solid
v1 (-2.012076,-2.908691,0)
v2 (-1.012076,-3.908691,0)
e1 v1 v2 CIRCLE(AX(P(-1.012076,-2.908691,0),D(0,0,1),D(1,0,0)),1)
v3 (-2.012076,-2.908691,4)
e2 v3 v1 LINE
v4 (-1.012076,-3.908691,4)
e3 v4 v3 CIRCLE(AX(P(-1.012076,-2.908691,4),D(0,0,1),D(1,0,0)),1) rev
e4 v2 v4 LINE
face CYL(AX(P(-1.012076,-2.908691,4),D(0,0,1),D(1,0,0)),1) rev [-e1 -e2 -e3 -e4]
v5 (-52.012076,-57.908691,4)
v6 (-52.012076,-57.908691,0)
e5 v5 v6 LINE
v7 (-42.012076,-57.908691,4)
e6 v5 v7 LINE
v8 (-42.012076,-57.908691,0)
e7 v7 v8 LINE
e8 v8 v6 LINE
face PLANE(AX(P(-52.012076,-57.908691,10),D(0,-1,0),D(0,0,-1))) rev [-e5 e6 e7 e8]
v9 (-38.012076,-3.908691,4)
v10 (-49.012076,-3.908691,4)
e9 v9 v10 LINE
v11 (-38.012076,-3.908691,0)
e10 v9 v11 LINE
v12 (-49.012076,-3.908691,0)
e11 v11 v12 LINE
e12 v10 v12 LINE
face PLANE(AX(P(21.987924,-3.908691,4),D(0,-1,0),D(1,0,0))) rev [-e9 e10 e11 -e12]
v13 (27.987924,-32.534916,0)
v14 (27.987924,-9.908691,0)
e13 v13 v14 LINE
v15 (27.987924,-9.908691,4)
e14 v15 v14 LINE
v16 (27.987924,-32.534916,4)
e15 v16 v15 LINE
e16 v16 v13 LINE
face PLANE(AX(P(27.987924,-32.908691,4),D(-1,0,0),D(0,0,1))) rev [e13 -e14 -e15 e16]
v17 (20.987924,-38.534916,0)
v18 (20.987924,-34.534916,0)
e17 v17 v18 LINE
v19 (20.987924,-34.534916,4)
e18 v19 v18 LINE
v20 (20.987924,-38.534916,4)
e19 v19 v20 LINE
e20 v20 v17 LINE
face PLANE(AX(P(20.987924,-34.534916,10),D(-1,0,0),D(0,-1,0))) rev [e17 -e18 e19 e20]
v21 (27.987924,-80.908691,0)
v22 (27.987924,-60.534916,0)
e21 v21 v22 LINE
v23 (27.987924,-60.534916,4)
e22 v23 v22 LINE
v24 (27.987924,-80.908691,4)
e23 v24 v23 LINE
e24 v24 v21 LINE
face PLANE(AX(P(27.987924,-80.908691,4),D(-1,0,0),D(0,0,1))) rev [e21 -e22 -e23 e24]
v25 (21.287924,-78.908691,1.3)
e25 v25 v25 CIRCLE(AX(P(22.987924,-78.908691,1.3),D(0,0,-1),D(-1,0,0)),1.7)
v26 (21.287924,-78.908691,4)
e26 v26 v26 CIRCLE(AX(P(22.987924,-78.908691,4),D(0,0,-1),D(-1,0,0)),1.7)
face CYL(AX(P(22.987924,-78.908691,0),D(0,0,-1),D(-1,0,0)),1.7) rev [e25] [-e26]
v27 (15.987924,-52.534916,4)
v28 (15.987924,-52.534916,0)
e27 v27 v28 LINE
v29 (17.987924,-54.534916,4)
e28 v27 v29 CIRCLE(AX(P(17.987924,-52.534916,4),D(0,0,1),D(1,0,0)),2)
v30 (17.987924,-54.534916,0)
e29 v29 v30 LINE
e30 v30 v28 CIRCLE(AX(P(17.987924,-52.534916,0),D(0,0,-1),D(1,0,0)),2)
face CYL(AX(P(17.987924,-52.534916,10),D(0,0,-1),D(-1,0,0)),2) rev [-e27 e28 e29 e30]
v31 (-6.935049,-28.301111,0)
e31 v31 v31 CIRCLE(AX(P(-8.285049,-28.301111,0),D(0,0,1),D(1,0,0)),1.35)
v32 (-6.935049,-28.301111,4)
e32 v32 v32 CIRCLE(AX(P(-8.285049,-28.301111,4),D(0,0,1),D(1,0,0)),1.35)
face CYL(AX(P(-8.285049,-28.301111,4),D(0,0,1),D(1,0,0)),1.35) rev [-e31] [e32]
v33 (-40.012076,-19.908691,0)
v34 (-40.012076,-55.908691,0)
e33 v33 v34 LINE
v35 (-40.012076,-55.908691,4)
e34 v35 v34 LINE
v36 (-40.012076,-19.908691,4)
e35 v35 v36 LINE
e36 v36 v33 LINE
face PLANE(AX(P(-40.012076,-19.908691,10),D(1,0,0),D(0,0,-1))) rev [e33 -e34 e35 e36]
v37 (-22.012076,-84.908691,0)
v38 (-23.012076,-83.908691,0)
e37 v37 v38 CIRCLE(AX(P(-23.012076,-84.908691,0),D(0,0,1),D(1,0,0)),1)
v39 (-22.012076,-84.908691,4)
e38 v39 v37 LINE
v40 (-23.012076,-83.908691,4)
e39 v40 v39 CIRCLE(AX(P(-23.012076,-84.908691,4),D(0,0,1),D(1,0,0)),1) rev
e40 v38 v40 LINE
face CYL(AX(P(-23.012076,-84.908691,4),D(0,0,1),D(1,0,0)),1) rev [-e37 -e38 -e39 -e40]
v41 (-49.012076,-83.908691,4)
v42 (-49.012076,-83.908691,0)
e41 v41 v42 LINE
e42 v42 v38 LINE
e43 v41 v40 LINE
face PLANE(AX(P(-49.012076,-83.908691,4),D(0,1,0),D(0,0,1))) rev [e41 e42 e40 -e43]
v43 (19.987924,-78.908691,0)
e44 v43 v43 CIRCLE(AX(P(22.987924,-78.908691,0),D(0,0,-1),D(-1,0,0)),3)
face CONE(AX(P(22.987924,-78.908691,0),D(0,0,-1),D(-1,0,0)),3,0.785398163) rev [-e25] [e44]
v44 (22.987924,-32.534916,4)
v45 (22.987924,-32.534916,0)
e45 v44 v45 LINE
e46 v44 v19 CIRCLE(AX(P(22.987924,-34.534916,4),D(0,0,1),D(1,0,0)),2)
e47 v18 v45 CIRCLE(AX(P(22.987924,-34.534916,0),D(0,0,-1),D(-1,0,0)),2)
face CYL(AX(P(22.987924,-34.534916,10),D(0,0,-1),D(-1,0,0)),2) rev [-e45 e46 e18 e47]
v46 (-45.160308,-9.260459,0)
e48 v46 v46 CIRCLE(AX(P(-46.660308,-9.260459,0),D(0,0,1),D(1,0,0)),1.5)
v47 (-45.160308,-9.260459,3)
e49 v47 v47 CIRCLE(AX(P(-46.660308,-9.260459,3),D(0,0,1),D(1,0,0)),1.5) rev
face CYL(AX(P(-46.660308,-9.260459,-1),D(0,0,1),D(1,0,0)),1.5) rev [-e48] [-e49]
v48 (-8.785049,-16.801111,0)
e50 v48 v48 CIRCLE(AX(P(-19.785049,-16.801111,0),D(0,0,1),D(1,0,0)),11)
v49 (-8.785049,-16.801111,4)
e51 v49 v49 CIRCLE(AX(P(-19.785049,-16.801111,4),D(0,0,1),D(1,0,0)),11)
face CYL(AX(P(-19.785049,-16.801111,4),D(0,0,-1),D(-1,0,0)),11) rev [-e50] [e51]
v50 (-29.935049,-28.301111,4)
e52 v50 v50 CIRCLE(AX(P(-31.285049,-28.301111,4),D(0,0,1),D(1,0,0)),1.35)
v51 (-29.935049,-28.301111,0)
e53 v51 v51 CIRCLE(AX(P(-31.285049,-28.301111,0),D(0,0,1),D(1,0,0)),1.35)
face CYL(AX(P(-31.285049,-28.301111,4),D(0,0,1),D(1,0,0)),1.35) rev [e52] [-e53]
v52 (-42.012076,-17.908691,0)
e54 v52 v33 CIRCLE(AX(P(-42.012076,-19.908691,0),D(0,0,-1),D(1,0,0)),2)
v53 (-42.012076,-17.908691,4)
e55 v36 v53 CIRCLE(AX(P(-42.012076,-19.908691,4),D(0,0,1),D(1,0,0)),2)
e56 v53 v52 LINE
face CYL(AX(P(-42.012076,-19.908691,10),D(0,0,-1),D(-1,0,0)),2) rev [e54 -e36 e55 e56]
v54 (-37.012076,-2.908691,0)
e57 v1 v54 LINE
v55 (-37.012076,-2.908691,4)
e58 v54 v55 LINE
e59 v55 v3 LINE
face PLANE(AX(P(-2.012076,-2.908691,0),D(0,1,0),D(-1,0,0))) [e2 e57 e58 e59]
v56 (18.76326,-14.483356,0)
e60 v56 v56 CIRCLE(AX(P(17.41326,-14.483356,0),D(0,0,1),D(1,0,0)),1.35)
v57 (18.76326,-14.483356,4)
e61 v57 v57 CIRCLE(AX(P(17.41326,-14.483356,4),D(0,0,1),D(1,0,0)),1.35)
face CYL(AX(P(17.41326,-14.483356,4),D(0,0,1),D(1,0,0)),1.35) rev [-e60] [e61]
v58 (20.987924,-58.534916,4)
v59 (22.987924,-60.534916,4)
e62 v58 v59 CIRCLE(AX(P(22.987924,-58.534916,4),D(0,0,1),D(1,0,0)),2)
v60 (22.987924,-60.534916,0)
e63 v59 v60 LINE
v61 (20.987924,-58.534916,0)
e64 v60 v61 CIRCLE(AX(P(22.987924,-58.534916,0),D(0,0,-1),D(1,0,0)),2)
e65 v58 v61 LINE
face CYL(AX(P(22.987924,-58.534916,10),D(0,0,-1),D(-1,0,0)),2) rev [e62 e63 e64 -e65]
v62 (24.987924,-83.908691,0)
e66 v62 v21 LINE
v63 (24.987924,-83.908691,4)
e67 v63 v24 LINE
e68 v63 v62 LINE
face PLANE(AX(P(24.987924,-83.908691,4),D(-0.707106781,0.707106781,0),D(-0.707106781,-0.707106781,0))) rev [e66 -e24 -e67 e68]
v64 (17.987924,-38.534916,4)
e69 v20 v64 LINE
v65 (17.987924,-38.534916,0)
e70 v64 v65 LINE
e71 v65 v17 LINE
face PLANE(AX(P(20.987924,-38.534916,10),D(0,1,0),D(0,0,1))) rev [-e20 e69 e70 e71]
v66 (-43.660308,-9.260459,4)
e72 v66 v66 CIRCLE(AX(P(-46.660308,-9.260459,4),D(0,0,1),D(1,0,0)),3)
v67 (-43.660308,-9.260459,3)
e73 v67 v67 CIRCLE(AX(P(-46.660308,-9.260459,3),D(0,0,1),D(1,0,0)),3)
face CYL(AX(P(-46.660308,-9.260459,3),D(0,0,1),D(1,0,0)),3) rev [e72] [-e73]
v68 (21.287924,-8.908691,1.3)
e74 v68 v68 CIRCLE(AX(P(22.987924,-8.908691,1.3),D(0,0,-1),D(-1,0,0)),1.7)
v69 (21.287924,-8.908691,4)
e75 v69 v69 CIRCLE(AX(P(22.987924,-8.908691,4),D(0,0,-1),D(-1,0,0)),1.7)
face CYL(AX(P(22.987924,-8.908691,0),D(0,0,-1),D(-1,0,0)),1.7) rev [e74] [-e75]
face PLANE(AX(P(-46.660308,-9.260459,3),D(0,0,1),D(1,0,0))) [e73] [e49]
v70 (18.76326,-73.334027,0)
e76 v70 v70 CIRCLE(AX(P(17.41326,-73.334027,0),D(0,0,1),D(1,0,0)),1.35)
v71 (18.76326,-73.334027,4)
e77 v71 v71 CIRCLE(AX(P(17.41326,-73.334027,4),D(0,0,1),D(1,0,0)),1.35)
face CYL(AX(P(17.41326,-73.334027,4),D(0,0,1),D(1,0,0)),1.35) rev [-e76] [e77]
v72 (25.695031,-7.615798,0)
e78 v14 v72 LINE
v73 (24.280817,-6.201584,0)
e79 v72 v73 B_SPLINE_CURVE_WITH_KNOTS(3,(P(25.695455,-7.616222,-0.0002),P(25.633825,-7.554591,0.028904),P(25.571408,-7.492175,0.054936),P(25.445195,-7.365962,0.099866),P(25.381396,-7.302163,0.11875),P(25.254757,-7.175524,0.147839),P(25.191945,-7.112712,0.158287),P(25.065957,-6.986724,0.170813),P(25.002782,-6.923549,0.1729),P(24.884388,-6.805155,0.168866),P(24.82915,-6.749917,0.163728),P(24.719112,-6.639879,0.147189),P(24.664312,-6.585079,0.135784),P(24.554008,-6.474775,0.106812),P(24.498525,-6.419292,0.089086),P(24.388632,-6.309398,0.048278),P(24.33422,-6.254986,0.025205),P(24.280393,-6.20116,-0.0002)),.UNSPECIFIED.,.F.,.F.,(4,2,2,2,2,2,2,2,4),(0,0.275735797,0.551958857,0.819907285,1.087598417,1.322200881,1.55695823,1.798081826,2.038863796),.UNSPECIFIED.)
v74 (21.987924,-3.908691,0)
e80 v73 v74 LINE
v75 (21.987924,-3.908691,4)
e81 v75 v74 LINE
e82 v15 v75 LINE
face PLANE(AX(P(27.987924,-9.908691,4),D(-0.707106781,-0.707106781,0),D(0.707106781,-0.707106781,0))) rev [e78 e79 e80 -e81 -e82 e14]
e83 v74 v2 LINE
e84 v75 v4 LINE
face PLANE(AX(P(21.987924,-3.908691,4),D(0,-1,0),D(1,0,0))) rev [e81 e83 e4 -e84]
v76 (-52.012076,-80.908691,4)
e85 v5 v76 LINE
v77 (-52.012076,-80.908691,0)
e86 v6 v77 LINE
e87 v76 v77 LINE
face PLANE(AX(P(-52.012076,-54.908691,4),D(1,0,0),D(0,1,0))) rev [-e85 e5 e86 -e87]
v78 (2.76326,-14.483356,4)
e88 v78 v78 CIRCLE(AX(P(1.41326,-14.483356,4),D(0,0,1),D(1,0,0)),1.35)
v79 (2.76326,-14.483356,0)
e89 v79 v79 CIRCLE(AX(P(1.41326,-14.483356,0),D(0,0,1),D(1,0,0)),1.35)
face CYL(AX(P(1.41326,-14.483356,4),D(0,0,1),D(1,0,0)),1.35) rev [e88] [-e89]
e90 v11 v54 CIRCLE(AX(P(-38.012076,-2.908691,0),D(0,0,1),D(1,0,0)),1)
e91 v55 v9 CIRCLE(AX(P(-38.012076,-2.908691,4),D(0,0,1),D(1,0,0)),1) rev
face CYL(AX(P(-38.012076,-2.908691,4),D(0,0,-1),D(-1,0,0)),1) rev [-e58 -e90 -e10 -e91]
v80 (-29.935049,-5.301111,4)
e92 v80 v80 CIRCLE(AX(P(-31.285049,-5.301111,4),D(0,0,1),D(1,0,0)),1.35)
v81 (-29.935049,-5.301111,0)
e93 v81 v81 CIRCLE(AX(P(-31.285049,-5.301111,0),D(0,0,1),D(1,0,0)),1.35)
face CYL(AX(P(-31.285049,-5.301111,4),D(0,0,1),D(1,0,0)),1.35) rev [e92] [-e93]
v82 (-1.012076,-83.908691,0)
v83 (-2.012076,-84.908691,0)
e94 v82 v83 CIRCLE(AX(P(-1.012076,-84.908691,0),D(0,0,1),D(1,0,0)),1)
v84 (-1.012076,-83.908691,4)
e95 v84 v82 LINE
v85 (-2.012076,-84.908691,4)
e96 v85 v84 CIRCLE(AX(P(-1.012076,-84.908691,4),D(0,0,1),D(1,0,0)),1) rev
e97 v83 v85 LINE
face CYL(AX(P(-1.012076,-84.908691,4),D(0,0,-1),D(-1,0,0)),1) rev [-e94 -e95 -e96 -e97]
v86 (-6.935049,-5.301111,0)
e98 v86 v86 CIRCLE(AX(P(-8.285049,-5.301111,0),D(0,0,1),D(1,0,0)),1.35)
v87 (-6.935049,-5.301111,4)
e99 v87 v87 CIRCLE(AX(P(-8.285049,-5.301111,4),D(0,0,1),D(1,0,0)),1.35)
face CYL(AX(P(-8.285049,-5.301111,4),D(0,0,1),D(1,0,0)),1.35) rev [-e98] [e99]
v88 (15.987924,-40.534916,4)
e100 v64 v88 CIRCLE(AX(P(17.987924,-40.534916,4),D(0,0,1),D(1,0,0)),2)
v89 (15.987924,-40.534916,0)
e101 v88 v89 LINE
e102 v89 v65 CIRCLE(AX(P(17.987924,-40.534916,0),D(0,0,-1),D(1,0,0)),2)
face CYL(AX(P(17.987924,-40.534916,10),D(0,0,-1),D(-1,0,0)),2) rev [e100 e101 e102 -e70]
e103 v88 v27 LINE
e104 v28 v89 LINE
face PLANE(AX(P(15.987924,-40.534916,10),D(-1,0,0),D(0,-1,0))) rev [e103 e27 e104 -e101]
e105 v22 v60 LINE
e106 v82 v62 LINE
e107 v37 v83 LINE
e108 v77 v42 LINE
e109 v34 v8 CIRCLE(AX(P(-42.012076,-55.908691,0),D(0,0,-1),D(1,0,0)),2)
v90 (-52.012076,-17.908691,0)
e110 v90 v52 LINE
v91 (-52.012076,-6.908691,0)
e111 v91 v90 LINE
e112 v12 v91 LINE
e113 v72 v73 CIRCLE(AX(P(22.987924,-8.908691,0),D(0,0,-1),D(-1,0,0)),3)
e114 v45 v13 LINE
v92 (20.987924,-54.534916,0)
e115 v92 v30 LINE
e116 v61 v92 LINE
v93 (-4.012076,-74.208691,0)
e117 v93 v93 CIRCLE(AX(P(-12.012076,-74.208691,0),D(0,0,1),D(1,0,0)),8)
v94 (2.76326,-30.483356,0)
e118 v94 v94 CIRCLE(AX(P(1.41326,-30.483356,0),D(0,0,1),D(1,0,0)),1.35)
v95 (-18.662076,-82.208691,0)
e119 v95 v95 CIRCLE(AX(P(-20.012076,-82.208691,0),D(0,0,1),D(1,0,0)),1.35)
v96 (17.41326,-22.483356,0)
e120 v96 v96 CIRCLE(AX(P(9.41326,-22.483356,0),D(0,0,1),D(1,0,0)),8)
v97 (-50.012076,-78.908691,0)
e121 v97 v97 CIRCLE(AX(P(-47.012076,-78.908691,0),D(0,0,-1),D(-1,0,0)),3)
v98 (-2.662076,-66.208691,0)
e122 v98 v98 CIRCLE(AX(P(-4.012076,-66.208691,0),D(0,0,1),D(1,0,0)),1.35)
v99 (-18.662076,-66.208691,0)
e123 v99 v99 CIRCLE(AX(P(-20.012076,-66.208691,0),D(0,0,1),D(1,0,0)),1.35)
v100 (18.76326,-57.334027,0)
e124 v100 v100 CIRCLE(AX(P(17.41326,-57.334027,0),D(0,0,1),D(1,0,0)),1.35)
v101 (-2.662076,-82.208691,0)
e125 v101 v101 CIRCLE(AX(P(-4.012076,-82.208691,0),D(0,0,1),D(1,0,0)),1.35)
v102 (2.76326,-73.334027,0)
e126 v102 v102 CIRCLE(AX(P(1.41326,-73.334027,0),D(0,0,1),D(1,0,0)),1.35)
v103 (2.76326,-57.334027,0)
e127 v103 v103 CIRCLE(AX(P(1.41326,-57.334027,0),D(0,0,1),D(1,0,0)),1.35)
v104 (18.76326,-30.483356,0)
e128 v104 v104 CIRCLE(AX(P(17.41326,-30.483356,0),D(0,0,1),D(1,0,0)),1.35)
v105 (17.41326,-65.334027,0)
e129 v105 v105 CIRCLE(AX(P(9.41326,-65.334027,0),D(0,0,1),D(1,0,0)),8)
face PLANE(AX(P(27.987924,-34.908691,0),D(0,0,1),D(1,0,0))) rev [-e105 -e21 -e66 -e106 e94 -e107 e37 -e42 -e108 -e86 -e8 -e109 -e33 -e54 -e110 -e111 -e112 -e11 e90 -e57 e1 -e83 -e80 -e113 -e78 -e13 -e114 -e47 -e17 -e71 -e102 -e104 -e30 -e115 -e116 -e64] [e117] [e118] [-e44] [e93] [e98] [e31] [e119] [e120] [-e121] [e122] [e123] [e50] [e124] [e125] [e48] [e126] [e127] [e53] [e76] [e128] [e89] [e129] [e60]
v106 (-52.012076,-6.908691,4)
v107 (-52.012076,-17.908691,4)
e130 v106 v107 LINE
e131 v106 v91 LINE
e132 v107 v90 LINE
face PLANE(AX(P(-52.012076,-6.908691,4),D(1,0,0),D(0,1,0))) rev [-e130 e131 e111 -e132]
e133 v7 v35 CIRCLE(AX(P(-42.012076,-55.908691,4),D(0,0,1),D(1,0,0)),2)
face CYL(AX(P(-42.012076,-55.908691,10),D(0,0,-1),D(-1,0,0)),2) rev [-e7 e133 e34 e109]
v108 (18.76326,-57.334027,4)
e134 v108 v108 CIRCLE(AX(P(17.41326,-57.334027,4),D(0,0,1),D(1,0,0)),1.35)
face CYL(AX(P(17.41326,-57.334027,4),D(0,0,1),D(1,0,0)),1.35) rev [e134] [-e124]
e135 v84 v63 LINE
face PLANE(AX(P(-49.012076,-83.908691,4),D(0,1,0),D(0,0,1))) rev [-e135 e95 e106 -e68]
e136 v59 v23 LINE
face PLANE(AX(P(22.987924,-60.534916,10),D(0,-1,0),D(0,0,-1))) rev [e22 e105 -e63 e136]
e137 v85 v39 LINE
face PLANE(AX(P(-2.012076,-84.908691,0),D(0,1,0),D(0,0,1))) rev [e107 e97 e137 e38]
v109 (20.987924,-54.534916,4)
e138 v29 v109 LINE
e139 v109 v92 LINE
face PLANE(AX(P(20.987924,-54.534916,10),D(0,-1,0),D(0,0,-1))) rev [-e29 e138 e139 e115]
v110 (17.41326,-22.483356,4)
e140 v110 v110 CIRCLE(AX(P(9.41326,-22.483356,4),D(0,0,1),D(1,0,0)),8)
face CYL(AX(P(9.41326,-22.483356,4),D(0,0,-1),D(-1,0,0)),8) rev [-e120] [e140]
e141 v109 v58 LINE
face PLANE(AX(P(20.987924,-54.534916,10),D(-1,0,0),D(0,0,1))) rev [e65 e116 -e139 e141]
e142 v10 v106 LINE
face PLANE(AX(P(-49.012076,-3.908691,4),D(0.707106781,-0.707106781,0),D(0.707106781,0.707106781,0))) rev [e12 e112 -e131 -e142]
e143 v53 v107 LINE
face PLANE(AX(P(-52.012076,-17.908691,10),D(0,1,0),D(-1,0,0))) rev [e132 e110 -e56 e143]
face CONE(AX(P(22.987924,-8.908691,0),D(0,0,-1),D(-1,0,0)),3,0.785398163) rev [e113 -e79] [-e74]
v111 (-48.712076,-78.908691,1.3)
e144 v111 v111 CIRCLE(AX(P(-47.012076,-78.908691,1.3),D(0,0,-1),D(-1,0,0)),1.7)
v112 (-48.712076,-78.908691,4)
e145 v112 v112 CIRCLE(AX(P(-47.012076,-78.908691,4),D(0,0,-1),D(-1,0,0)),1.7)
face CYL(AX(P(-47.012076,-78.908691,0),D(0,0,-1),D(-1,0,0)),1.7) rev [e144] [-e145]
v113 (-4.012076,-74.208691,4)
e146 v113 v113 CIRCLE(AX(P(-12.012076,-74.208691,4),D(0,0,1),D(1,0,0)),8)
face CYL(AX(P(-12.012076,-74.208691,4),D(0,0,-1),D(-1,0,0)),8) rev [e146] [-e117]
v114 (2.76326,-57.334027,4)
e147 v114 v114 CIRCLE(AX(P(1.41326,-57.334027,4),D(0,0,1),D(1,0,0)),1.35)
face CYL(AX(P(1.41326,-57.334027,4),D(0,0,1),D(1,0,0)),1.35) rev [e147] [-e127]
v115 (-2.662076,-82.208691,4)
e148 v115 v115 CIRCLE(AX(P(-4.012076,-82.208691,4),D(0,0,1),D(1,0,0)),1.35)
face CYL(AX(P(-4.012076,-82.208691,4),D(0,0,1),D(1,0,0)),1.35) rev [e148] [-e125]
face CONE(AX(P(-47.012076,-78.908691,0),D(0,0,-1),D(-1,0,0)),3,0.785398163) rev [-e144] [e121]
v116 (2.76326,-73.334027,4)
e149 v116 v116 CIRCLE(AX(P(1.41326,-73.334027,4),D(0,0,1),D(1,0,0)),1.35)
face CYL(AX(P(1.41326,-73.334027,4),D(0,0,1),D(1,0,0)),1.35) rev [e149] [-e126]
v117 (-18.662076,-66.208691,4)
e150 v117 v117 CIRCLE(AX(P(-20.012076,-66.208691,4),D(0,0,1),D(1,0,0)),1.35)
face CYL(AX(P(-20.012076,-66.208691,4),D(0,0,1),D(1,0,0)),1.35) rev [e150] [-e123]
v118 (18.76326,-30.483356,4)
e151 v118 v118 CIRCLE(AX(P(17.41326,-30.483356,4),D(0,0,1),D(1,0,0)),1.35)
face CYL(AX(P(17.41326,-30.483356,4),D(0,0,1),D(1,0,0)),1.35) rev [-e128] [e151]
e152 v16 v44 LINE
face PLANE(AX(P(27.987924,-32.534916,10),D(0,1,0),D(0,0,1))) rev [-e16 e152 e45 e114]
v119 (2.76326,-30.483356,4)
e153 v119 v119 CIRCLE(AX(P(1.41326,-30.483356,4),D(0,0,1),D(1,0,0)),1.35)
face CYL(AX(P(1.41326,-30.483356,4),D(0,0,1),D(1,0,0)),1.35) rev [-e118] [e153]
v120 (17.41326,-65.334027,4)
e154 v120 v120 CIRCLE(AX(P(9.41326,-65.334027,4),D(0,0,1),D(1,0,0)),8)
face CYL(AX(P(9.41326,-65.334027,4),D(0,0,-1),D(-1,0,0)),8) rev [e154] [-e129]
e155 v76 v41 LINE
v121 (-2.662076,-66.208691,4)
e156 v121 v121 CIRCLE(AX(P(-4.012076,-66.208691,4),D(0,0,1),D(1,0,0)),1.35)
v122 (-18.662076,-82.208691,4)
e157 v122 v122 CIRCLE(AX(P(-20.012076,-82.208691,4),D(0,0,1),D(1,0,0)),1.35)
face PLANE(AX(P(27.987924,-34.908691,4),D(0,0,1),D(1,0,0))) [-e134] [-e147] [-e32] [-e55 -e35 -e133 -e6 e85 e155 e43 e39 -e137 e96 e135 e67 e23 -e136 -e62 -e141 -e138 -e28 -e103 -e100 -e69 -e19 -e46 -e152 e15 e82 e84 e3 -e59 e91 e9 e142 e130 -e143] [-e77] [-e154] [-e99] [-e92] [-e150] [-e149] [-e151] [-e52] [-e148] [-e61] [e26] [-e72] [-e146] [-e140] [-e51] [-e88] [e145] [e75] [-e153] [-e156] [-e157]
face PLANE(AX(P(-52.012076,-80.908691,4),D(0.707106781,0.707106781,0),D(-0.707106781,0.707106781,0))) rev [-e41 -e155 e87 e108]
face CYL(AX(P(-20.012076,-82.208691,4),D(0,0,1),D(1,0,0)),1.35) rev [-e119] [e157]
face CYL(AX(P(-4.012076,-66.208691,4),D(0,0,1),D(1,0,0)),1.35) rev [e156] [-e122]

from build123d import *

# Parameters (mm, degrees)
SKETCH_1_R                  = 11
SKETCH_1_R_2                = 8
EXTRUDE_1_DEPTH             = 4
SKETCH_2_R                  = 1.5
CUT_EXTRUDE_1_DEPTH         = 5
HOLE_WIZARD_2_7_2_7_1_D     = 2.7
HOLE_WIZARD_2_7_2_7_1_DEPTH = 8
HOLE_WIZARD_2_7_2_7_1_TIP   = 0.779422863
SKETCH_5_W                  = 35
SKETCH_5_H                  = 4
EXTRUDE_2_DEPTH             = 1
FILLET_1_R                  = 1
SKETCH_6_W                  = 20
SKETCH_6_H                  = 4
EXTRUDE_3_DEPTH             = 1
FILLET_2_R                  = 1
CUT_EXTRUDE_4_DEPTH         = 10
SKETCH_8_R                  = 3
CUT_EXTRUDE_5_DEPTH         = 1
HOLE_WIZARD_M31_D           = 3.4
HOLE_WIZARD_M31_CSINK_D     = 6
HOLE_WIZARD_M31_CSINK_ANGLE = 90


with BuildPart() as part:
    # Эскиз1 → Вытянуть1 (new body)
    with BuildSketch(Plane.XY):
        with BuildLine():
            Line((27.987924211, -32.908691095), (27.987924211, -9.908691095))
            Line((27.987924211, -9.908691095), (21.987924211, -3.908691095))
            Line((21.987924211, -3.908691095), (-49.012075789, -3.908691095))
            Line((-49.012075789, -3.908691095), (-52.012075789, -6.908691095))
            Line((-52.012075789, -6.908691095), (-52.012075789, -32.908691095))
            ThreePointArc((-52.012075789, -32.908691095), (-50.597862227, -33.494477533), (-50.012075789, -34.908691095))
            Line((-50.012075789, -34.908691095), (-50.012075789, -52.908691095))
            ThreePointArc((-50.012075789, -52.908691095), (-50.597862227, -54.322904658), (-52.012075789, -54.908691095))
            Line((-52.012075789, -54.908691095), (-52.012075789, -80.908691095))
            Line((-52.012075789, -80.908691095), (-49.012075789, -83.908691095))
            Line((-49.012075789, -83.908691095), (24.987924211, -83.908691095))
            Line((24.987924211, -83.908691095), (27.987924211, -80.908691095))
            Line((27.987924211, -80.908691095), (27.987924211, -54.908691095))
            ThreePointArc((27.987924211, -54.908691095), (26.573710649, -54.322904658), (25.987924211, -52.908691095))
            Line((25.987924211, -52.908691095), (25.987924211, -34.908691095))
            ThreePointArc((25.987924211, -34.908691095), (26.573710649, -33.494477533), (27.987924211, -32.908691095))
        make_face()
        with Locations((-19.785049223, -16.80111127)):
            Circle(SKETCH_1_R, mode=Mode.SUBTRACT)
        with Locations((9.413259681, -22.483355625)):
            Circle(SKETCH_1_R_2, mode=Mode.SUBTRACT)
        with Locations((-12.012075789, -74.208691095)):
            Circle(SKETCH_1_R_2, mode=Mode.SUBTRACT)
        with Locations((9.413259681, -65.334026565)):
            Circle(SKETCH_1_R_2, mode=Mode.SUBTRACT)
    extrude(amount=EXTRUDE_1_DEPTH)

    # Эскиз2 → Вырез-Вытянуть1 (cut)
    with BuildSketch(Plane.XY.offset(4)):
        with Locations((-46.660308067, -9.260458817)):
            Circle(SKETCH_2_R)
    extrude(amount=-CUT_EXTRUDE_1_DEPTH, mode=Mode.SUBTRACT)

    # Диаметр отверстия Ø2.7 (2.7)1
    with Locations(Plane(origin=(-8.285049223, -5.30111127, 4), x_dir=(1, 0, 0), z_dir=(0, 0, 1))):
        with Locations((0, 0), (0, -23), (-23, -23), (-23, 0), (25.698308904, -9.182244355), (25.698308904, -25.182244355), (9.698308904, -25.182244355), (9.698308904, -9.182244355), (25.698308904, -52.032915295), (25.698308904, -68.032915295), (9.698308904, -68.032915295), (9.698308904, -52.032915295), (4.272973434, -60.907579825), (4.272973434, -76.907579825), (-11.727026566, -60.907579825), (-11.727026566, -76.907579825)):
            Hole(HOLE_WIZARD_2_7_2_7_1_D / 2, depth=HOLE_WIZARD_2_7_2_7_1_DEPTH)
            with Locations((0, 0, -(HOLE_WIZARD_2_7_2_7_1_DEPTH + HOLE_WIZARD_2_7_2_7_1_TIP / 2))):  # 120° drill point
                Cone(0, HOLE_WIZARD_2_7_2_7_1_D / 2, HOLE_WIZARD_2_7_2_7_1_TIP, mode=Mode.SUBTRACT)

    # Эскиз5 → Вытянуть2 (add)
    with BuildSketch(Plane(origin=(0, -3.908691095, 0), x_dir=(1, 0, 0), z_dir=(0, 1, 0))):
        with Locations((-19.512075789, -2)):
            Rectangle(SKETCH_5_W, SKETCH_5_H)
    extrude(amount=EXTRUDE_2_DEPTH)

    # Скругление1
    fillet_1_edges = [part.edges().sort_by_distance(p)[0] for p in [
        (-2.012075789, -3.908691095, 2),
        (-37.012075789, -3.908691095, 2),
    ]]
    fillet(fillet_1_edges, radius=FILLET_1_R - 0.0001)  # a hair under: the kernel refuses the full size

    # Эскиз6 → Вытянуть3 (add)
    with BuildSketch(Plane.XZ.offset(83.908691095)):
        with Locations((-12.012075789, 2)):
            Rectangle(SKETCH_6_W, SKETCH_6_H)
    extrude(amount=EXTRUDE_3_DEPTH)

    # Скругление2
    fillet_2_edges = [part.edges().sort_by_distance(p)[0] for p in [
        (-2.012075789, -83.908691095, 2),
        (-22.012075789, -83.908691095, 2),
    ]]
    fillet(fillet_2_edges, radius=FILLET_2_R - 0.0001)  # a hair under: the kernel refuses the full size

    # Эскиз7 → Вытянуть4 (cut)
    with BuildSketch(Plane(origin=(0, 0, 0), x_dir=(-1, 0, 0), z_dir=(0, 0, -1))):
        with BuildLine():
            Line((52.012075789, -17.908691095), (42.012075789, -17.908691095))
            ThreePointArc((42.012075789, -17.908691095), (40.597862227, -18.494477533), (40.012075789, -19.908691095))
            Line((40.012075789, -19.908691095), (40.012075789, -55.908691095))
            ThreePointArc((40.012075789, -55.908691095), (40.597862227, -57.322904658), (42.012075789, -57.908691095))
            Line((42.012075789, -57.908691095), (52.012075789, -57.908691095))
            Line((52.012075789, -57.908691095), (52.012075789, -17.908691095))
        make_face()
        with BuildLine():
            Line((-20.987924211, -54.534916172), (-20.987924211, -58.534916172))
            ThreePointArc((-20.987924211, -58.534916172), (-21.573710649, -59.949129735), (-22.987924211, -60.534916172))
            Line((-22.987924211, -60.534916172), (-27.987924211, -60.534916172))
            Line((-27.987924211, -60.534916172), (-27.987924211, -32.534916172))
            Line((-27.987924211, -32.534916172), (-22.987924211, -32.534916172))
            ThreePointArc((-22.987924211, -32.534916172), (-21.573710649, -33.12070261), (-20.987924211, -34.534916172))
            Line((-20.987924211, -34.534916172), (-20.987924211, -38.534916172))
            Line((-20.987924211, -38.534916172), (-17.987924211, -38.534916172))
            ThreePointArc((-17.987924211, -38.534916172), (-16.573710649, -39.12070261), (-15.987924211, -40.534916172))
            Line((-15.987924211, -40.534916172), (-15.987924211, -52.534916172))
            ThreePointArc((-15.987924211, -52.534916172), (-16.573710649, -53.949129735), (-17.987924211, -54.534916172))
            Line((-17.987924211, -54.534916172), (-20.987924211, -54.534916172))
        make_face()
    extrude(amount=-CUT_EXTRUDE_4_DEPTH, mode=Mode.SUBTRACT)

    # Эскиз8 → Вытянуть5 (cut)
    with BuildSketch(Plane.XY.offset(4)):
        with Locations((-46.660308067, -9.260458817)):
            Circle(SKETCH_8_R)
    extrude(amount=-CUT_EXTRUDE_5_DEPTH, mode=Mode.SUBTRACT)

    # Зенковка для винта с потайной головкой M31 (through all)
    with Locations(Plane(origin=(22.987924211, -78.908691095, 0), x_dir=(-1, 0, 0), z_dir=(0, 0, -1))):
        with Locations((0, 0), (70, 0), (0, 70)):
            CounterSinkHole(HOLE_WIZARD_M31_D / 2, HOLE_WIZARD_M31_CSINK_D / 2, counter_sink_angle=HOLE_WIZARD_M31_CSINK_ANGLE)


solid = part.part
